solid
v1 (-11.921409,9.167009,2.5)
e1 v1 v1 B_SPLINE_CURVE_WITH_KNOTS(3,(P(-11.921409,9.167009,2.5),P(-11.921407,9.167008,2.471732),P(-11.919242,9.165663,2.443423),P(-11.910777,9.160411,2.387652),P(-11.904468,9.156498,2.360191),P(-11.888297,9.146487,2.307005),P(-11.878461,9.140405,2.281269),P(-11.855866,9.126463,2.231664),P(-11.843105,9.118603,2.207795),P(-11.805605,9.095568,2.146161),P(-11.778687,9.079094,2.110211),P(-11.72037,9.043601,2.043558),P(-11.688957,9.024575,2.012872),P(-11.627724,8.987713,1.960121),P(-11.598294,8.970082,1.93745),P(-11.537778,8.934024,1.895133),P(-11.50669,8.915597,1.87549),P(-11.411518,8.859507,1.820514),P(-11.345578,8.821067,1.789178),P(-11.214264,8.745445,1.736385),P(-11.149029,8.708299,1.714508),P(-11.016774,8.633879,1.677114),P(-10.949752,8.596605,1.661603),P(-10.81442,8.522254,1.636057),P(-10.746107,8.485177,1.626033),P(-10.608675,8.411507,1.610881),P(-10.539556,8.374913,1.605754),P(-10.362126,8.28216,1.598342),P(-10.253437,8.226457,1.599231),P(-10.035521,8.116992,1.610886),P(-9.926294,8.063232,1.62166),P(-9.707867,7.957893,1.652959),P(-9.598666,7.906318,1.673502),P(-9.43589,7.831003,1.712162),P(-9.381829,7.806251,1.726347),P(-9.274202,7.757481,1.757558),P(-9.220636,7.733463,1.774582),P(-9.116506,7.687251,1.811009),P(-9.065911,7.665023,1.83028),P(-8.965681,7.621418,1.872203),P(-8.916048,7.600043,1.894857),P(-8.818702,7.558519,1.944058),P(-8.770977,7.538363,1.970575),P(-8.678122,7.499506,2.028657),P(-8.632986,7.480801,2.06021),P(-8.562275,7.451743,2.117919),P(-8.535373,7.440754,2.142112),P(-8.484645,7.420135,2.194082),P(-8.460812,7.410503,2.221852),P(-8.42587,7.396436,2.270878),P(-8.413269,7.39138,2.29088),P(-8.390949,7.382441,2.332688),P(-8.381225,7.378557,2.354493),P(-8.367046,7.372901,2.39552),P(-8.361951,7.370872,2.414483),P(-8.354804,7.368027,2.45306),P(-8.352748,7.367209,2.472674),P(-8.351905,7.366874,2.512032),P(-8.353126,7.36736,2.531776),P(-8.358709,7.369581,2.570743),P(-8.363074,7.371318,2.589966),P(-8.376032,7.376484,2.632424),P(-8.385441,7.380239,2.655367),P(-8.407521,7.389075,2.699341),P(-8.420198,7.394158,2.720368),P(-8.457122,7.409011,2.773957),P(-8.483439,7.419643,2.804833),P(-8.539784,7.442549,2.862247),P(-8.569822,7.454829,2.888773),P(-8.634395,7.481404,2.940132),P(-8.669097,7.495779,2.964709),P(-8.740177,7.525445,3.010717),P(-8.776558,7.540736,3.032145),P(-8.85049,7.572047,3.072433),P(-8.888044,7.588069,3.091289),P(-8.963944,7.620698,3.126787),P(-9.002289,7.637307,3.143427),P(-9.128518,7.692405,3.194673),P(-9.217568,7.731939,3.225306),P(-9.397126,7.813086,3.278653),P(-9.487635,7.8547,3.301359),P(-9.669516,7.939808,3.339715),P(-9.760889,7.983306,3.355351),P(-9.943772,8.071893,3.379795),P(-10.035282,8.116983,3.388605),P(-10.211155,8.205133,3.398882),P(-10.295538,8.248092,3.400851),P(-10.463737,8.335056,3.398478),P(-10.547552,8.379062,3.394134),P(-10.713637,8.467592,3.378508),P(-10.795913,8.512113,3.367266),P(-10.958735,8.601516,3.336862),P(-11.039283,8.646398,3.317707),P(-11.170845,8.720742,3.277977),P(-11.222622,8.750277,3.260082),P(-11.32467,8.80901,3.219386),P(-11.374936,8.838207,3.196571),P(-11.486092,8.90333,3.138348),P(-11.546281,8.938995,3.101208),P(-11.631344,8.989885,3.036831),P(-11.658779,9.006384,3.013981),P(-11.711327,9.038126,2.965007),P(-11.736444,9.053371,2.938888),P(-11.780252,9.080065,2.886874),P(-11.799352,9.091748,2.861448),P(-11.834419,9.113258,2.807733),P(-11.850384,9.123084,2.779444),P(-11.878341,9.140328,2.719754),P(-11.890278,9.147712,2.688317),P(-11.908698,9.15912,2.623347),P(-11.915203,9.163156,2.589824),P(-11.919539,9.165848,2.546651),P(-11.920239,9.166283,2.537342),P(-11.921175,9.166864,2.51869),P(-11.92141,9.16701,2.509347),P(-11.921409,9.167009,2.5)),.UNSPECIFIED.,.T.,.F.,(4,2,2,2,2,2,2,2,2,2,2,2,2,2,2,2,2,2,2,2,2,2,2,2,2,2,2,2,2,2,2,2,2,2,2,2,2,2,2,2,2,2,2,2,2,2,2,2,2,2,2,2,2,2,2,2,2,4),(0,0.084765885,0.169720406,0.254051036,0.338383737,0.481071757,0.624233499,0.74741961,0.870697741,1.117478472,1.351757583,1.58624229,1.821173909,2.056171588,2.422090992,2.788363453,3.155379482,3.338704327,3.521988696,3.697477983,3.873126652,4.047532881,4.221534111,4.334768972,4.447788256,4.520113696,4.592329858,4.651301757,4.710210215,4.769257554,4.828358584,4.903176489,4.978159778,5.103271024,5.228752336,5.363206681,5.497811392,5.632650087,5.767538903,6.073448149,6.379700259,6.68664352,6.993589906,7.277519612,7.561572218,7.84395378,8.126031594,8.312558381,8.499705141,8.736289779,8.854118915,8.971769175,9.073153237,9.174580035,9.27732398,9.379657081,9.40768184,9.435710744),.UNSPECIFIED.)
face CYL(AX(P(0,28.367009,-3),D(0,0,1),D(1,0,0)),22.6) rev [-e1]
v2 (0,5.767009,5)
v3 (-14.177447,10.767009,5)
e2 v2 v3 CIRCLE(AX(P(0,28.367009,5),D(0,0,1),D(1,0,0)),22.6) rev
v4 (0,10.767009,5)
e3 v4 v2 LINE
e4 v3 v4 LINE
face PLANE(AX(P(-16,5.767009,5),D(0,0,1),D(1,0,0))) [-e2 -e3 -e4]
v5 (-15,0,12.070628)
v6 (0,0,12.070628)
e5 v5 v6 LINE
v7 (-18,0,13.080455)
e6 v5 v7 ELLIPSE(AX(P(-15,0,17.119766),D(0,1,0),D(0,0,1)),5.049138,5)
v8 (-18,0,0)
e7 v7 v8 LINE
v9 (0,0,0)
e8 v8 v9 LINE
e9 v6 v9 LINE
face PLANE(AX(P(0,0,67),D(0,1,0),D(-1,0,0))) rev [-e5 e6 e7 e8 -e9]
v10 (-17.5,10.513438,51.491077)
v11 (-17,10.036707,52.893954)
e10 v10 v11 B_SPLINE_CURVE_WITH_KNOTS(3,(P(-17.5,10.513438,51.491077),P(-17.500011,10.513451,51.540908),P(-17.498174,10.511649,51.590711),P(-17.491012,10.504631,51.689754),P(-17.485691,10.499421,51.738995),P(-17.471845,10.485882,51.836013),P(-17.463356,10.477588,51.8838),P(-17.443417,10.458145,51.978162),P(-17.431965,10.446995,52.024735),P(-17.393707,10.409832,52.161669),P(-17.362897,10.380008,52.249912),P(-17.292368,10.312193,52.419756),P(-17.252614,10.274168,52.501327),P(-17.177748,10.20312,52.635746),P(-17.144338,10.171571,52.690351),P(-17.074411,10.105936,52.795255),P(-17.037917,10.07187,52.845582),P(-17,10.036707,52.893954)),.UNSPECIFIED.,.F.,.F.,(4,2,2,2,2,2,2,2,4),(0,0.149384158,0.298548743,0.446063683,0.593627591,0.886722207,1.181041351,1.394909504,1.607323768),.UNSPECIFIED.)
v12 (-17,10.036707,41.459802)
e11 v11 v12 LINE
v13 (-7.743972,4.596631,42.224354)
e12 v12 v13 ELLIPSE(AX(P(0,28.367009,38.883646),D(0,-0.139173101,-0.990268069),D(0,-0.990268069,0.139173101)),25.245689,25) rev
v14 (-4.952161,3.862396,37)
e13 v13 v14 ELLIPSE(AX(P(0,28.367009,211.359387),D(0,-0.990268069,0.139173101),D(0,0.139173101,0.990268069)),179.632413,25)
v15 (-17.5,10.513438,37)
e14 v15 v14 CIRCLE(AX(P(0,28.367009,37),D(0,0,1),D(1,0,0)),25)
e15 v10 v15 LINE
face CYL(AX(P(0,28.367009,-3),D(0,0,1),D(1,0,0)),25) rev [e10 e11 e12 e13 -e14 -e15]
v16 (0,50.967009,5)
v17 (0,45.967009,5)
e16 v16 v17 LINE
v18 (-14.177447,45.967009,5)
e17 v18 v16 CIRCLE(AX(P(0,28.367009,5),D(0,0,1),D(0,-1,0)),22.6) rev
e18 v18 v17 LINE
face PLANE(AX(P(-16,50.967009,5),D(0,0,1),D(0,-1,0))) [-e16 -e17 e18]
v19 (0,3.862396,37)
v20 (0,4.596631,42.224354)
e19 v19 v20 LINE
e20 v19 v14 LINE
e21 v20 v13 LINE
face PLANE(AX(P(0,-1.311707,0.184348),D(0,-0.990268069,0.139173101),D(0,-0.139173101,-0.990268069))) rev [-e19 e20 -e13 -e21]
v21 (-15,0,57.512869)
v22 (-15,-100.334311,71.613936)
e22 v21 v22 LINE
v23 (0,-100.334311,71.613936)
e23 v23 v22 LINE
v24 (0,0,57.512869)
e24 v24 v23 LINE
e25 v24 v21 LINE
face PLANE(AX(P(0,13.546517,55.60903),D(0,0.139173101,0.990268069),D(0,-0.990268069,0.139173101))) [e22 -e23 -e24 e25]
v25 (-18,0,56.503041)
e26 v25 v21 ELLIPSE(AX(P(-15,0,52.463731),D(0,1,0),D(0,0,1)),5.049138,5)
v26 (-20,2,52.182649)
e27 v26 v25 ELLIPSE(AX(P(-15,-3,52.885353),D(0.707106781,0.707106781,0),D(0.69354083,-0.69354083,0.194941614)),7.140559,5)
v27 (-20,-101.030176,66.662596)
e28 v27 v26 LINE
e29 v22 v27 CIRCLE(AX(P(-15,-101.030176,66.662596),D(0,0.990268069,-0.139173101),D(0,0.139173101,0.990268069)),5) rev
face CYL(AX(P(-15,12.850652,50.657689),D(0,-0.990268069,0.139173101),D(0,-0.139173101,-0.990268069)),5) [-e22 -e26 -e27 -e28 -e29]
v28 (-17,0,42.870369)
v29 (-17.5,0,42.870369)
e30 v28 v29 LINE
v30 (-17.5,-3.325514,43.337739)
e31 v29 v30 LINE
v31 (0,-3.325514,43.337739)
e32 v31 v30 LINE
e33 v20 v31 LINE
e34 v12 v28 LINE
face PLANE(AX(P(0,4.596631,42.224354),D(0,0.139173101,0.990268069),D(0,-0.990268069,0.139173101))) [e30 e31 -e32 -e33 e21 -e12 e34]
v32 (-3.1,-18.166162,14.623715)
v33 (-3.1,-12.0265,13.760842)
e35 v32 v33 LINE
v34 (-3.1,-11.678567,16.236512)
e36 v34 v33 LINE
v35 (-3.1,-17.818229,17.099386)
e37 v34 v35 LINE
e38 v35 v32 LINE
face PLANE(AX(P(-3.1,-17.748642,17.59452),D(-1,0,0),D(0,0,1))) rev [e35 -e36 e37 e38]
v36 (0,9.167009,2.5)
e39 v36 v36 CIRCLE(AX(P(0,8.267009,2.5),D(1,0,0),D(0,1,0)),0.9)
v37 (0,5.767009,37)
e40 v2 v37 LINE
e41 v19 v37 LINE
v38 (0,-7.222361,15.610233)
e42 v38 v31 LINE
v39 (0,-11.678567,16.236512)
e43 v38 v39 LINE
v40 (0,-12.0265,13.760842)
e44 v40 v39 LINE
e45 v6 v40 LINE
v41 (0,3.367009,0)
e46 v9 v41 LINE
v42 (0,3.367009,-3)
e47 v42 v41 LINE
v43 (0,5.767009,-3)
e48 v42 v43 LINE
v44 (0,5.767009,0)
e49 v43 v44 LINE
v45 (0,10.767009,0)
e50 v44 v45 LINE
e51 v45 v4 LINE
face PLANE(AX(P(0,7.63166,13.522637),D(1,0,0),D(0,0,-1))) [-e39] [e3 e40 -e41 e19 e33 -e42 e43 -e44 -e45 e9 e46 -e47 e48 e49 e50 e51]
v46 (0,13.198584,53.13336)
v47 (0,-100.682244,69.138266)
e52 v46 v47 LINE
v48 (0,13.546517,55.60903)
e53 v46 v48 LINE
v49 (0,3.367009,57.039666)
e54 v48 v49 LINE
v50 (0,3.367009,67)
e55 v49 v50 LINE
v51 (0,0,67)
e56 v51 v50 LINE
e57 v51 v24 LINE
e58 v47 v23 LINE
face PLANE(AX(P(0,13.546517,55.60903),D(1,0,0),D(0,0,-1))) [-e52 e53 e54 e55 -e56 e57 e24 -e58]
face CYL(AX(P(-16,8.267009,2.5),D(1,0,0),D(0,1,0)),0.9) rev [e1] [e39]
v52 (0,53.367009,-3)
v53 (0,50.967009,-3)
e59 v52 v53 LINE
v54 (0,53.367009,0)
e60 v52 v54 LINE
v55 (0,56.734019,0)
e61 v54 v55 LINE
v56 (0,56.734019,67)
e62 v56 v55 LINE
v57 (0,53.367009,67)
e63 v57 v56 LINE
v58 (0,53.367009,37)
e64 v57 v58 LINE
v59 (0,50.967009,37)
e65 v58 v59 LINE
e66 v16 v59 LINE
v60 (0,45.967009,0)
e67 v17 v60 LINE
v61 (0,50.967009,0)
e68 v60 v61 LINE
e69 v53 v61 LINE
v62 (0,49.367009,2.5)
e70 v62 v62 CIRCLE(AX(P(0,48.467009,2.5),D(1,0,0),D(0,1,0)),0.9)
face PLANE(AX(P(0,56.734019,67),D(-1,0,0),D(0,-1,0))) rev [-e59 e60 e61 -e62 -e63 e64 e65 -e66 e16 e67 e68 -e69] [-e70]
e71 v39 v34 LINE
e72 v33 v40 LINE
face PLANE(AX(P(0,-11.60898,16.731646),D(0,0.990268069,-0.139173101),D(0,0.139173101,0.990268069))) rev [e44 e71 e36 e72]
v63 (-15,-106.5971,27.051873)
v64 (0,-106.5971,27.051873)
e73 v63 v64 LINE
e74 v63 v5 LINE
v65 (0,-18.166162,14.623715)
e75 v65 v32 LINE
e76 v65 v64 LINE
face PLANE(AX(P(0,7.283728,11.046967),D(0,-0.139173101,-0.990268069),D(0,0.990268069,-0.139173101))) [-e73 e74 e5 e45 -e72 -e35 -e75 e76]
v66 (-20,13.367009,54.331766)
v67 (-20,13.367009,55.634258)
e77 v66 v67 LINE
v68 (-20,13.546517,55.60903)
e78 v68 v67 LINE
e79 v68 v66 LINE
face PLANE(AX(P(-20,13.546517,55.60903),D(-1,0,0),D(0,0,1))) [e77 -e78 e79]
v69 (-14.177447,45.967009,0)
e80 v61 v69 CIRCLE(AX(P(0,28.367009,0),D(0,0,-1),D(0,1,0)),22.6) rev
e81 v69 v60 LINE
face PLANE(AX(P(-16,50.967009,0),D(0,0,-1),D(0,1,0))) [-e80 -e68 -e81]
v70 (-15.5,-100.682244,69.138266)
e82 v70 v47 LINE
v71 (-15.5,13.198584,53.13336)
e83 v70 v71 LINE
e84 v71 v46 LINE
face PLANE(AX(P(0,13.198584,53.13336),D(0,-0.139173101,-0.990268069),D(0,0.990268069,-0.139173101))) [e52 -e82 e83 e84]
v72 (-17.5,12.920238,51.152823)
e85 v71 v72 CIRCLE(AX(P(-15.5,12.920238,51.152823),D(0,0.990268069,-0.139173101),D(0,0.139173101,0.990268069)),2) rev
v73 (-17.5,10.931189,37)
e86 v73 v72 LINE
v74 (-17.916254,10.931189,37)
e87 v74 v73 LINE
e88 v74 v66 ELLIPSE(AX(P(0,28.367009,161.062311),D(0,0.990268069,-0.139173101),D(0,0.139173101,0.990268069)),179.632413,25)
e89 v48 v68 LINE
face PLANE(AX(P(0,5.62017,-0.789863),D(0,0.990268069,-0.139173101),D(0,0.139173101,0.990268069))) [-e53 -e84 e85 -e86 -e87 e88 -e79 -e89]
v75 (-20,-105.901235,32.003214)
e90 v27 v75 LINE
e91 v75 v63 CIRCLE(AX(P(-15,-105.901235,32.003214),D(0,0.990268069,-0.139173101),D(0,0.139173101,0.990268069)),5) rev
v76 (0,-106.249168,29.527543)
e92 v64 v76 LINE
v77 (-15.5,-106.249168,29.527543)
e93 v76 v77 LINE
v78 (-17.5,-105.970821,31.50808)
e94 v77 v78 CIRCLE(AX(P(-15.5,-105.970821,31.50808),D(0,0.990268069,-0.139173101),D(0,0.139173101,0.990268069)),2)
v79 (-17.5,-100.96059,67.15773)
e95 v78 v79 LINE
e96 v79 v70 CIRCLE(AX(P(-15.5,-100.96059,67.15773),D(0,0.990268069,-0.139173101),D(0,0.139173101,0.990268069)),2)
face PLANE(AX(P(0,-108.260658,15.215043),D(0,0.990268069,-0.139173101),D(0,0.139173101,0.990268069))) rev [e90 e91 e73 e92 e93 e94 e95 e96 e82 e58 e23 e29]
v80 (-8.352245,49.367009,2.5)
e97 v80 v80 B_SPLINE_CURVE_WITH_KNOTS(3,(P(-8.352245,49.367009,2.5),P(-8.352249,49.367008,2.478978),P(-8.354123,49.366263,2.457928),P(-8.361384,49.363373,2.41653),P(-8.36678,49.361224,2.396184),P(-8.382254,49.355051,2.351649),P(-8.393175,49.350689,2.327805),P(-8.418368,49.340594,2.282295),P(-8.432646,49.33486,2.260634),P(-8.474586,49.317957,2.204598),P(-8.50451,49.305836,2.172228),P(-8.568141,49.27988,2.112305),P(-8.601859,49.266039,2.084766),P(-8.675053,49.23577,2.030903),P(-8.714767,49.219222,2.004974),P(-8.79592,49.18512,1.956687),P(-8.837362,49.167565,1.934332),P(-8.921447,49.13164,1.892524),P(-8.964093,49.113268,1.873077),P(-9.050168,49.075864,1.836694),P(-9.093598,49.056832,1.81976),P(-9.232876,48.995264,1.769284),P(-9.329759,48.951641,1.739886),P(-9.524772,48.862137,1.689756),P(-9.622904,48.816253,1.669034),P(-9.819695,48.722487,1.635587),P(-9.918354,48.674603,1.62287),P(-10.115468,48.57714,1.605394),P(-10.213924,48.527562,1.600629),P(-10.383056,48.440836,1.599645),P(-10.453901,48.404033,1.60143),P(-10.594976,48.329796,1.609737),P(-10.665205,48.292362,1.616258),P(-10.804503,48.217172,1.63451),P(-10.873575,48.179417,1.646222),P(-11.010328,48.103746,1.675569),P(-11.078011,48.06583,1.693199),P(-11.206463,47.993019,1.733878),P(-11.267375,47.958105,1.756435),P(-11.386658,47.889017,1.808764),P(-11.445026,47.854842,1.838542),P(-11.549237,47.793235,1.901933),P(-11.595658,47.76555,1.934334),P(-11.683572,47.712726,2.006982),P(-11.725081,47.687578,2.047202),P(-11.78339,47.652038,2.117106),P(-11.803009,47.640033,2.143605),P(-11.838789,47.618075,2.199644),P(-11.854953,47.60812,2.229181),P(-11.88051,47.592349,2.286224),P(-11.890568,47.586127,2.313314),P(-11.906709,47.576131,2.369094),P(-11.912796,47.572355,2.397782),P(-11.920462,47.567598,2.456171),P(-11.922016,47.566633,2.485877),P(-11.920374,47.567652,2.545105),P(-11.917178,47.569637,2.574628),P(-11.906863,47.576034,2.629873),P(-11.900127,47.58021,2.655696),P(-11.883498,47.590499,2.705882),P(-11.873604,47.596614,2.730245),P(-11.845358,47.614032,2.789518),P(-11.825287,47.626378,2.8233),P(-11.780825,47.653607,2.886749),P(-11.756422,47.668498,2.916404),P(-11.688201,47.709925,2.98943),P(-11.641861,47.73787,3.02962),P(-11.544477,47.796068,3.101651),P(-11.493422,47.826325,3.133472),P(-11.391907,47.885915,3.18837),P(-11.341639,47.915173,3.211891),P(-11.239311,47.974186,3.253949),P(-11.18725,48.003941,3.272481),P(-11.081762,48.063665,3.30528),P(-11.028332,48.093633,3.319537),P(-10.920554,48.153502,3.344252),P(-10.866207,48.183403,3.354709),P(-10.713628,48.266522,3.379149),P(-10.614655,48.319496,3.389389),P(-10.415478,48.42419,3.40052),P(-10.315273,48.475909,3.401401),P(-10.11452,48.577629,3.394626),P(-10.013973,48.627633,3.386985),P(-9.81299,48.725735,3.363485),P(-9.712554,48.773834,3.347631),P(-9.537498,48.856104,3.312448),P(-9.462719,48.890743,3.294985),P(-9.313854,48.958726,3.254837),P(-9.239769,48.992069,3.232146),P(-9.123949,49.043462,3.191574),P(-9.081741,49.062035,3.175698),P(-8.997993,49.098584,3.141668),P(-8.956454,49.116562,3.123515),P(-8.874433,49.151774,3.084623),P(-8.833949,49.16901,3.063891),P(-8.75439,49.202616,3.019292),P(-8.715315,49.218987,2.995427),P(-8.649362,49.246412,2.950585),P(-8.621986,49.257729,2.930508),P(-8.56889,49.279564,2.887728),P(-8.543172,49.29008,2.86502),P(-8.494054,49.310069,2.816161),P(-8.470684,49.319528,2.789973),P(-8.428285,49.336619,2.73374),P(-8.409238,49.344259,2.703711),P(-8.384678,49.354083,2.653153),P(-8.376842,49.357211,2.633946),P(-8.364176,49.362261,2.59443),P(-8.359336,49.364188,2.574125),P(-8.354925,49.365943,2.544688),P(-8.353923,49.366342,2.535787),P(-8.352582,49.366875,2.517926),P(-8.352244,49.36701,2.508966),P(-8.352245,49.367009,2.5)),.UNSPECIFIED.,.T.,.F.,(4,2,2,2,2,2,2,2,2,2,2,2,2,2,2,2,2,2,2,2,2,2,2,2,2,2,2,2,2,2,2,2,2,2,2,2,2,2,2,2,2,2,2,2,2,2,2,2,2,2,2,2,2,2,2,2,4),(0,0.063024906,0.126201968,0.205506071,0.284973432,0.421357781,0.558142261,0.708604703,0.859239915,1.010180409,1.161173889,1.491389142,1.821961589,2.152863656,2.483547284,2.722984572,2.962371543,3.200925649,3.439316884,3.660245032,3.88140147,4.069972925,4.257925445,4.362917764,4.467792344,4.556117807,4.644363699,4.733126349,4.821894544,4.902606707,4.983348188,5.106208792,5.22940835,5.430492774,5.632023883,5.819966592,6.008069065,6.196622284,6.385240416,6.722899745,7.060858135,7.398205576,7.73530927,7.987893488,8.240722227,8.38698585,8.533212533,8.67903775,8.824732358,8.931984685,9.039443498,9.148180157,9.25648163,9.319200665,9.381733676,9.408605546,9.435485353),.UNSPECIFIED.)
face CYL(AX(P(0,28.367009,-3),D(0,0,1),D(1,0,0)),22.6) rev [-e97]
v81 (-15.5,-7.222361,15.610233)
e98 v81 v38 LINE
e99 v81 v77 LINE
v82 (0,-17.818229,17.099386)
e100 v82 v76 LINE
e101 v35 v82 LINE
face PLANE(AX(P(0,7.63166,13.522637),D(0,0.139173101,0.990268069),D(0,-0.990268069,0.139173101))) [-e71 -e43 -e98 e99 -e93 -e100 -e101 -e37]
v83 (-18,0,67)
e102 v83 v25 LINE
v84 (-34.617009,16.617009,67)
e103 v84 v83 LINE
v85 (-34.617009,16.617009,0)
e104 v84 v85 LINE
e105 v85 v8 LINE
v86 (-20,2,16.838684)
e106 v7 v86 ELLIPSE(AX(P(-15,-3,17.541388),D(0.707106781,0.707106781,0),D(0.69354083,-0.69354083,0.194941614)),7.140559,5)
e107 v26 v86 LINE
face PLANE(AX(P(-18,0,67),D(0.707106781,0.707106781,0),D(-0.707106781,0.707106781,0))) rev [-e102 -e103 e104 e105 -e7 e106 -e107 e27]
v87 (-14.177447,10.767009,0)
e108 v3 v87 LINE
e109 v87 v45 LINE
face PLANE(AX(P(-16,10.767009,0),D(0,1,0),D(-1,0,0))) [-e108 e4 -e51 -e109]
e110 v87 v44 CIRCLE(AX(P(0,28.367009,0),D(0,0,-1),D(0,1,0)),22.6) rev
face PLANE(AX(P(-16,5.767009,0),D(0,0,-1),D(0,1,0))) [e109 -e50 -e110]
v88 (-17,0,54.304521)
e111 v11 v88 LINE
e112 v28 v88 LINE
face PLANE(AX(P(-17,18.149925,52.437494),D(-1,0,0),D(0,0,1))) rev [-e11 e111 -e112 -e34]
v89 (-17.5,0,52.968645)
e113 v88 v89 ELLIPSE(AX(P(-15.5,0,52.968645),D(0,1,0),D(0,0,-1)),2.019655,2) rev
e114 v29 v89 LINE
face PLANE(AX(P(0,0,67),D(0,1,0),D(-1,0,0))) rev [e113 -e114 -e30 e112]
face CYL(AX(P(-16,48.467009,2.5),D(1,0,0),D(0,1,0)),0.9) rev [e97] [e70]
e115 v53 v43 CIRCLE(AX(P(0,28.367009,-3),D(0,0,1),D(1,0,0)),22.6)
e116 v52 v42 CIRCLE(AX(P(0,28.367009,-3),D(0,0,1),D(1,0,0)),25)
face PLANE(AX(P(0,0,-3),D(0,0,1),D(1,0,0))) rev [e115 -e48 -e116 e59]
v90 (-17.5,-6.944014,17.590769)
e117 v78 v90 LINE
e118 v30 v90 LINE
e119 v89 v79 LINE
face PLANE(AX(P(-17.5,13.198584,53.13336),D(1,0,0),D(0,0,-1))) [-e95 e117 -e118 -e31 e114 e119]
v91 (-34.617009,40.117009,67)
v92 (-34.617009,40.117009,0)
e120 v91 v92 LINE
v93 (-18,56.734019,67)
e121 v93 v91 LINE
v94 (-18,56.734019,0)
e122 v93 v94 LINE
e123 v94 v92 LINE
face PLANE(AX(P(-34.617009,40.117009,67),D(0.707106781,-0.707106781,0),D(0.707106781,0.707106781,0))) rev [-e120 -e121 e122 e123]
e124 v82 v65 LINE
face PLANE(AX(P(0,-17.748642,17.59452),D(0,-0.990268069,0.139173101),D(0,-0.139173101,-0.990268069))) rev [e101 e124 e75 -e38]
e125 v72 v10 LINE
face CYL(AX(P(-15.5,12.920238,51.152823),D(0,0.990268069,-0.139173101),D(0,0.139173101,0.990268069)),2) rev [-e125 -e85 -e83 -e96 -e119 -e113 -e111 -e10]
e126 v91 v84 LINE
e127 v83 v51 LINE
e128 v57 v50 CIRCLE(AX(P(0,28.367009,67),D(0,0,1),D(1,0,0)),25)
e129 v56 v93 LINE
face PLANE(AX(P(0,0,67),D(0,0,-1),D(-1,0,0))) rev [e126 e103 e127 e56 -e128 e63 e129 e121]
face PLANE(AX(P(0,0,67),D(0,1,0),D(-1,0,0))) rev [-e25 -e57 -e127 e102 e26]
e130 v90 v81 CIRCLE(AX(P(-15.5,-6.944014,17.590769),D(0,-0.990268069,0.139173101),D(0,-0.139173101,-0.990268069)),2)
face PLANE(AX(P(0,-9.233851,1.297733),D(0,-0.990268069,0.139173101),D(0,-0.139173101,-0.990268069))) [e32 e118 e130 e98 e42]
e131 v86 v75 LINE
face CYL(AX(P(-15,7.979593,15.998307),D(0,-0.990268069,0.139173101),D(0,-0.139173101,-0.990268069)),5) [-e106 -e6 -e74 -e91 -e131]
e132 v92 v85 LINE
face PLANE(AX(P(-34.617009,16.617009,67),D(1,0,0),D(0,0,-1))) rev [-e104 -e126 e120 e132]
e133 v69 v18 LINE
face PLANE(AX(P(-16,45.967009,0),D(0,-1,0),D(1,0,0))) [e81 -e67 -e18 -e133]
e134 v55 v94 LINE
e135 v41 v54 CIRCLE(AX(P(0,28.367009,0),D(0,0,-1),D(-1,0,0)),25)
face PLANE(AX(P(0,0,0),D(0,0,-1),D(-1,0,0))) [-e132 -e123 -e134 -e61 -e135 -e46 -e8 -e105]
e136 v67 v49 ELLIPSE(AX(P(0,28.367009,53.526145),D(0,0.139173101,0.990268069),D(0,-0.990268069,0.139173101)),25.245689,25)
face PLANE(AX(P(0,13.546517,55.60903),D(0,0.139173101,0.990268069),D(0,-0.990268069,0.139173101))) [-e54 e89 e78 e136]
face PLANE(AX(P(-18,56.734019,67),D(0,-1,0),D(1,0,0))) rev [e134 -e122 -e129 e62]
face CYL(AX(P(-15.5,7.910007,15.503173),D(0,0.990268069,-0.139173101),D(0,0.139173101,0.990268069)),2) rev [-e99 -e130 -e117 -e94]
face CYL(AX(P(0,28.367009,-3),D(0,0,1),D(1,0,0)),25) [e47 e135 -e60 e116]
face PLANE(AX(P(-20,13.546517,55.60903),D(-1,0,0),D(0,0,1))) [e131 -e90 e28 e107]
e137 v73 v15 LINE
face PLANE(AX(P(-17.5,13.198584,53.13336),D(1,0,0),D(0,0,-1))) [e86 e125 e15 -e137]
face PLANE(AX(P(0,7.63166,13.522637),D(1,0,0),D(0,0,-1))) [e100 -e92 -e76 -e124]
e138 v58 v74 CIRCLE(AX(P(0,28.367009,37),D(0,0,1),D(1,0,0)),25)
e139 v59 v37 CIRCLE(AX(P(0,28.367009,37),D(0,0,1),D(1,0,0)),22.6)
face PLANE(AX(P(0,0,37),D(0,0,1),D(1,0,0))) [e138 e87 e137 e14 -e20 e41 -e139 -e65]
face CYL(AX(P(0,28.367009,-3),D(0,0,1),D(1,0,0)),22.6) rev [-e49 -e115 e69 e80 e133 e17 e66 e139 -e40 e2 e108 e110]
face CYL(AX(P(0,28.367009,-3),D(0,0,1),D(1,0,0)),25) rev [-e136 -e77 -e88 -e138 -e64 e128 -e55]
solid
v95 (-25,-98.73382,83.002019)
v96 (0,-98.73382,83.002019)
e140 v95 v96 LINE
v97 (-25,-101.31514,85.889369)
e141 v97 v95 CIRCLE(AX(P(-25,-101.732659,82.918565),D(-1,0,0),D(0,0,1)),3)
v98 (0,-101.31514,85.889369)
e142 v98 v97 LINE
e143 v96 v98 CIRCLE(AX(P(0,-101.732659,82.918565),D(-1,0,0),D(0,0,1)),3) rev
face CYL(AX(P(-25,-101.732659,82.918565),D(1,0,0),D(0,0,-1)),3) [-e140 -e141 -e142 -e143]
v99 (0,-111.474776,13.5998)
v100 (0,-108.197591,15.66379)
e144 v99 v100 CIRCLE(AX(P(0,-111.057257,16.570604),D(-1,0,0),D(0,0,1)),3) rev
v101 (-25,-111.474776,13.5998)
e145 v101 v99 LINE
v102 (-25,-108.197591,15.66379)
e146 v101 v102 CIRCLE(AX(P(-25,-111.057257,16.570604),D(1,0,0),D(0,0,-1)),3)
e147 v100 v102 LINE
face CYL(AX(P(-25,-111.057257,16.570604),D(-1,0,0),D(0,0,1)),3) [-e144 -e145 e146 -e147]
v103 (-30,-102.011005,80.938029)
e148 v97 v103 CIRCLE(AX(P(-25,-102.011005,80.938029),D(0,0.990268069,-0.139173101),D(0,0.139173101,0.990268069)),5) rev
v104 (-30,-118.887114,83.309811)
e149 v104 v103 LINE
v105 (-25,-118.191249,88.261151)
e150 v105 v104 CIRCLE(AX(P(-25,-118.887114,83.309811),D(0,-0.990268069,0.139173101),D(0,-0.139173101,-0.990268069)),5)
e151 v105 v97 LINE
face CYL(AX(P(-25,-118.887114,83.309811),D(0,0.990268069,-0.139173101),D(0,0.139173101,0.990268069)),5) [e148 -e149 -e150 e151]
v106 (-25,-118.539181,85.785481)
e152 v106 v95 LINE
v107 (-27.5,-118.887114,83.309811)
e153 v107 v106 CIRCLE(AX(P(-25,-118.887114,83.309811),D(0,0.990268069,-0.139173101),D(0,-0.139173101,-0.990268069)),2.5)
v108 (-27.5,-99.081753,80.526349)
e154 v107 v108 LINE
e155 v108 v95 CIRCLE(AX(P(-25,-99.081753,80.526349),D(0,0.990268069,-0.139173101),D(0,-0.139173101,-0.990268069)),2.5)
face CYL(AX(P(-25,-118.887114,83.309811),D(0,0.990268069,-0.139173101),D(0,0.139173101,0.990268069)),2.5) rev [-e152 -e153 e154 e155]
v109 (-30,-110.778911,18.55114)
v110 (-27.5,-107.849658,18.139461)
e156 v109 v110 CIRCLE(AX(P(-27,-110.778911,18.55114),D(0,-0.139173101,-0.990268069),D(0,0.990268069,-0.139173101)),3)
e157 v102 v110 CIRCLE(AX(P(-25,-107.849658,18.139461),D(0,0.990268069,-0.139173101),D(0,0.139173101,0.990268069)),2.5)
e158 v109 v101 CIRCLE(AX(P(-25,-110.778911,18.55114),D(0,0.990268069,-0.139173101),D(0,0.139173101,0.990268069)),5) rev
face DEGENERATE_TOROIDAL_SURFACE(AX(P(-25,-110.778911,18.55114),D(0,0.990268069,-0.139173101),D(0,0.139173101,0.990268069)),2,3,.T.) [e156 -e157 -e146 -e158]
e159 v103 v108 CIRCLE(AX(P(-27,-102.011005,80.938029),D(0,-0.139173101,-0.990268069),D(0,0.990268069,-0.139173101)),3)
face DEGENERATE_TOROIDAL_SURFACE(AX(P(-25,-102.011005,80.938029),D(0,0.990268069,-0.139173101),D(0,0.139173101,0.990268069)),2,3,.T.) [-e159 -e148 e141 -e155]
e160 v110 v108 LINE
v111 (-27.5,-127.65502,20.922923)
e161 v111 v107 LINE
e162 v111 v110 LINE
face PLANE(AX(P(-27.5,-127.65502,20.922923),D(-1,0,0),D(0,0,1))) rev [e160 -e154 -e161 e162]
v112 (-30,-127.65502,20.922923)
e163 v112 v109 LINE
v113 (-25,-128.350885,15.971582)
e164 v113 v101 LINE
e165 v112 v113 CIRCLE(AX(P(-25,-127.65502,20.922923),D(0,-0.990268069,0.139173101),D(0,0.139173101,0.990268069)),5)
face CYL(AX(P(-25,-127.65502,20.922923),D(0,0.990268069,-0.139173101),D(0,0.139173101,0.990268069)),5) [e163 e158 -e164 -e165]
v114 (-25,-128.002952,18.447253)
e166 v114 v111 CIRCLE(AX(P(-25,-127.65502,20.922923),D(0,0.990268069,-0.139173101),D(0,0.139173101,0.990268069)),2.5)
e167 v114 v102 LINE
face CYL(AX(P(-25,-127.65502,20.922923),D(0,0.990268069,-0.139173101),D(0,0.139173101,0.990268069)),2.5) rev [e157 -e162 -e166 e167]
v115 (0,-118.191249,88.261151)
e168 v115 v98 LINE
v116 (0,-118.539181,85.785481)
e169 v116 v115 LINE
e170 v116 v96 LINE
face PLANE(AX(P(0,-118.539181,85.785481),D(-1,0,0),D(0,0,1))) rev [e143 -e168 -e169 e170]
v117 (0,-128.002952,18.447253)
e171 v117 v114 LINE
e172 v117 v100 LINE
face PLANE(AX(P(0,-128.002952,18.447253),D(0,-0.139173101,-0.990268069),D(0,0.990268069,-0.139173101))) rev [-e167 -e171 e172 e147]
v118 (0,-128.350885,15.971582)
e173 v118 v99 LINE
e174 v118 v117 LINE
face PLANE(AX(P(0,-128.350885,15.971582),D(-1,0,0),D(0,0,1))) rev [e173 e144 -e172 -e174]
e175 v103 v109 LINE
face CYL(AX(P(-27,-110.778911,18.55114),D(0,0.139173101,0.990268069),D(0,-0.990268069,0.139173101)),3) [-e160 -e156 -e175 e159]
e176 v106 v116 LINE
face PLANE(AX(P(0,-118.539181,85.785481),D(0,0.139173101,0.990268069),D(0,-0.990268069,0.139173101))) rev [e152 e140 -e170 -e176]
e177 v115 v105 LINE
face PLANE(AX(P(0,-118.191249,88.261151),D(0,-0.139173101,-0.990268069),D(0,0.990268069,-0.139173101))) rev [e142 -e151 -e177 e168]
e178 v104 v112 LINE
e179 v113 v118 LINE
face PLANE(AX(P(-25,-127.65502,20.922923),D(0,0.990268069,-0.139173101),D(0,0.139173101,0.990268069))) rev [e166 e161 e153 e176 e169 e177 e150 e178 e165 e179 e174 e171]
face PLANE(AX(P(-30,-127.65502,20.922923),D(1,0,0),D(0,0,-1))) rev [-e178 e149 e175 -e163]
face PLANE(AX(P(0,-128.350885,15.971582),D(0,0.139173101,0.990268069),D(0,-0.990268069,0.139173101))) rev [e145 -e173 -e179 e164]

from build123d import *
from build123d.topology import SkipClean

# Parameters (mm, degrees)
Y_KSEKLIK_EKSTR_ZYON1_DEPTH      = 67
IZIM2_R                          = 25
KES_EKSTR_ZYON1_DEPTH            = 70
Y_KSEKLIK_EKSTR_ZYON2_DEPTH      = 40
Y_KSEKLIK_EKSTR_ZYON7_DEPTH      = 100
Y_KSEKLIK_EKSTR_ZYON7_DEPTH_BACK = 15
IZIM15_W                         = 5
IZIM15_H                         = 5
IZIM15_R                         = 0.9
Y_KSEKLIK_EKSTR_ZYON8_DEPTH      = 16
IZIM11_R                         = 22.5
KES_EKSTR_ZYON17_DEPTH           = 33
IZIM24_W                         = 12
IZIM24_H                         = 17
KES_EKSTR_ZYON18_DEPTH           = 20
IZIM29_W                         = 28
IZIM29_H                         = 17.5
Y_KSEKLIK_EKSTR_ZYON12_DEPTH     = 8
IZIM34_W                         = 3.1
IZIM34_H                         = 6.2
KES_EKSTR_ZYON20_DEPTH           = 3
IZIM44_R                         = 22.6
KES_EKSTR_ZYON25_DEPTH           = 30
RADYUS4_R                        = 5
RADYUS5_START                    = -109.324597764
RADYUS5_DEPTH                    = 115
Y_KSEKLIK_EKSTR_ZYON16_DEPTH     = 20
RADYUS7_R                        = 3


with BuildPart() as part:
    # Çizim1 → Yükseklik-Ekstrüzyon1 (new body)
    with BuildSketch(Plane.XY):
        Polygon((0, 0), (-18, 0), (-34.617009358, 16.617009358), (-34.617009358, 40.117009358), (-18, 56.734018716), (0, 56.734018716), align=None)
    extrude(amount=Y_KSEKLIK_EKSTR_ZYON1_DEPTH)

    # Çizim2 → Kes-Ekstrüzyon1 (cut)
    with BuildSketch(Plane.XY.offset(67)):
        with Locations((0, 28.367009358)):
            Circle(IZIM2_R)
    extrude(amount=-KES_EKSTR_ZYON1_DEPTH, mode=Mode.SUBTRACT)

    # Çizim5 → Yükseklik-Ekstrüzyon2 (add)
    with BuildSketch(Plane.XY.offset(37)):
        with BuildLine():
            Line((0, 50.967009358), (0, 53.367009358))
            ThreePointArc((0, 53.367009358), (-25, 28.367009358), (0, 3.367009358))
            Line((0, 3.367009358), (0, 5.767009358))
            ThreePointArc((0, 5.767009358), (-22.6, 28.367009358), (0, 50.967009358))
        make_face()
    extrude(amount=-Y_KSEKLIK_EKSTR_ZYON2_DEPTH)

    # Çizim15 → Yükseklik-Ekstrüzyon8 (add)
    # profile 1 of 2: a face of its own
    with BuildSketch(Plane(origin=(0, 0, 0), x_dir=(0, 0, -1), z_dir=(1, 0, 0))):
        with Locations((-2.5, 8.267009358)):
            Rectangle(IZIM15_W, IZIM15_H)
        with Locations(Location((-2.5, 8.267009358, 0), (0, 0, 90))):
            Circle(IZIM15_R, mode=Mode.SUBTRACT)
    # profile 2 of 2: a face of its own
    with BuildSketch(Plane(origin=(0, 0, 0), x_dir=(0, 0, -1), z_dir=(1, 0, 0))):
        with Locations((-2.5, 48.467009358)):
            Rectangle(IZIM15_W, IZIM15_H)
        with Locations(Location((-2.5, 48.467009358, 0), (0, 0, 90))):
            Circle(IZIM15_R, mode=Mode.SUBTRACT)
    extrude(amount=-Y_KSEKLIK_EKSTR_ZYON8_DEPTH)

    # Çizim24 → Kes-Ekstrüzyon18 (cut)
    with BuildSketch(Plane(origin=(0, -9.23385142, 1.297733186), x_dir=(0, -0.13917310096006572, -0.9902680687415703), z_dir=(0, -0.9902680687415703, 0.13917310096006572))):
        with Locations((-48.453157304, -8.5)):
            Rectangle(IZIM24_W, IZIM24_H)
    extrude(amount=-KES_EKSTR_ZYON18_DEPTH, mode=Mode.SUBTRACT)



with BuildPart() as body_2:
    # Çizim21 → Yükseklik-Ekstrüzyon7 (new, two sides: drawn at the far end of the back side and taken through both)
    with BuildSketch(Plane(origin=(0, -9.23385142, 1.297733186), x_dir=(0, -0.13917310096006572, -0.9902680687415703), z_dir=(0, -0.9902680687415703, 0.13917310096006572)).offset(-Y_KSEKLIK_EKSTR_ZYON7_DEPTH_BACK)):
        Polygon((-56.953157304, 0), (-56.953157304, -20), (-11.953157304, -20), (-11.953157304, 0), (-14.453157304, 0), (-14.453157304, -17.5), (-54.453157304, -17.5), (-54.453157304, 0), align=None)
    extrude(amount=Y_KSEKLIK_EKSTR_ZYON7_DEPTH + Y_KSEKLIK_EKSTR_ZYON7_DEPTH_BACK)

    # Çizim11 → Kes-Ekstrüzyon17 (cut)
    with BuildSketch(Plane.XY.offset(37)):
        with Locations((0, 28.367009358)):
            Circle(IZIM11_R)
    extrude(amount=-KES_EKSTR_ZYON17_DEPTH, mode=Mode.SUBTRACT)


with BuildPart() as part_1:
    add(part.part)

    add(body_2.part)  # Yükseklik-Ekstrüzyon12 merges body 2
    # Çizim29 → Yükseklik-Ekstrüzyon12 (add)
    with BuildSketch(Plane(origin=(0, -9.23385142, 1.297733186), x_dir=(0, -0.13917310096006572, -0.9902680687415703), z_dir=(0, -0.9902680687415703, 0.13917310096006572))):
        with Locations((-28.453157304, -8.75)):
            Rectangle(IZIM29_W, IZIM29_H)
    extrude(amount=-Y_KSEKLIK_EKSTR_ZYON12_DEPTH)

    # Çizim34 → Kes-Ekstrüzyon20 (cut)
    with BuildSketch(Plane(origin=(0, 1.663557968, 11.836829998), x_dir=(-1, 0, 0), z_dir=(0, -0.13917310096006574, -0.9902680687415703))):
        with Locations((1.55, -16.924597764)):
            Rectangle(IZIM34_W, IZIM34_H)
    extrude(amount=-KES_EKSTR_ZYON20_DEPTH, mode=Mode.SUBTRACT)

    # Çizim44 → Kes-Ekstrüzyon25 (cut)
    with SkipClean():  # the faces are left unmerged after this step: merging them gives an invalid solid
        with BuildSketch(Plane.XY.offset(37)):
            with Locations((0, 28.367009358)):
                Circle(IZIM44_R)
        extrude(amount=-KES_EKSTR_ZYON25_DEPTH, mode=Mode.SUBTRACT)

    # Radyus4
    radyus4_edges = [part_1.edges().sort_by_distance(p)[0] for p in [
        (-20, -52.298550163, 19.420709718),
        (-20, -49.167155391, 64.422861646),
    ]]
    fillet(radyus4_edges, radius=RADYUS4_R)

    # Radyus5: read off the stored shape, not the designer's step
    # Radyus5 outline → Radyus5 (add)
    with SkipClean():  # the faces are left unmerged after this step: merging them gives an invalid solid
        with BuildSketch(Plane(origin=(0, 0, 0), x_dir=(1, 0, 0), z_dir=(0, 0.9902680687415703, -0.13917310096006602)).offset(RADYUS5_START)):
            with BuildLine():
                Line((-17.5, -52.453157304), (-17.5, -54.453157304))
                Line((-17.5, -54.453157304), (-15.5, -54.453157304))
                ThreePointArc((-15.5, -54.453157304), (-16.914213562, -53.867370866), (-17.5, -52.453157304))
            make_face()
            with BuildLine():
                Line((-17.5, -14.453157304), (-17.5, -16.453157304))
                ThreePointArc((-17.5, -16.453157304), (-16.914213562, -15.038943742), (-15.5, -14.453157304))
                Line((-15.5, -14.453157304), (-17.5, -14.453157304))
            make_face()
        extrude(amount=RADYUS5_DEPTH)


with BuildPart() as body_2_2:
    # Çizim45 → Yükseklik-Ekstrüzyon16 (new body)
    with BuildSketch(Plane(origin=(0, -108.260658294, 15.215043282), x_dir=(1, 0, 0), z_dir=(0, -0.9902680687415703, 0.13917310096006602))):
        with BuildLine():
            Line((0, -2.046842696), (-25, -2.046842696))
            ThreePointArc((-25, -2.046842696), (-28.535533906, -0.582376602), (-30, 2.953157304))
            Line((-30, 2.953157304), (-30, 65.953157304))
            ThreePointArc((-30, 65.953157304), (-28.535533906, 69.48869121), (-25, 70.953157304))
            Line((-25, 70.953157304), (0, 70.953157304))
            Line((0, 70.953157304), (0, 68.453157304))
            Line((0, 68.453157304), (-25, 68.453157304))
            ThreePointArc((-25, 68.453157304), (-26.767766953, 67.720924257), (-27.5, 65.953157304))
            Line((-27.5, 65.953157304), (-27.5, 2.953157304))
            ThreePointArc((-27.5, 2.953157304), (-26.767766953, 1.185390351), (-25, 0.453157304))
            Line((-25, 0.453157304), (0, 0.453157304))
            Line((0, 0.453157304), (0, -2.046842696))
        make_face()
    extrude(amount=Y_KSEKLIK_EKSTR_ZYON16_DEPTH)

    # Radyus7
    # the kernel refuses this fillet: 3 mm, written as the material it takes off along each edge
    with BuildSketch(Plane(origin=(7.395099729, -108.545523739, 13.188120318), x_dir=(0, -0.9902680687415703, 0.13917310096006616), z_dir=(-1, 0, 0)), Plane(origin=(-25, -98.385887369, 85.477689336), x_dir=(0, -0.9902680687415703, 0.13917310096006602), z_dir=(1, 0, 0))) as radyus7_piece_1:
        with BuildLine():
            CenterArc((2.958039892, 3), RADYUS7_R, 189.594068227, 80.405931773)
            Line((0, 2.5), (-0.059160798, 2.49))
            ThreePointArc((-0.059160798, 2.49), (-0.06, 1.25), (-0.06, 0))
            Line((-0.06, 0), (0, -0.06))
            Line((0, -0.06), (2.958039892, -0.06))
            Line((2.958039892, -0.06), (2.958039892, 0))
        make_face()
    extrude(amount=32.395099729, mode=Mode.SUBTRACT)
    with BuildSketch(Plane(origin=(-25, -99.081752874, 80.526348993), x_dir=(-1, 0, 0), z_dir=(2.814511130798017e-15, -0.13917310096006602, -0.9902680687415703))) as radyus7_piece_2:
        with BuildLine():
            CenterArc((2, -2.958039892), RADYUS7_R, 360, 80.405931773)
            Line((2.5, 0), (2.51, 0.059160798))
            ThreePointArc((2.51, 0.059160798), (3.75, 0.06), (5, 0.06))
            Line((5, 0.06), (5.06, 0))
            Line((5.06, 0), (5.06, -2.958039892))
            Line((5.06, -2.958039892), (5, -2.958039892))
        make_face()
    revolve(axis=Axis((-25, -99.081752874, 80.526348993), (0, 0.9902680687415703, -0.13917310096006602)), revolution_arc=90, mode=Mode.SUBTRACT)
    with BuildSketch(Plane(origin=(-30, -107.849658234, 18.139460662), x_dir=(0, -0.9902680687415701, 0.13917310096006602), z_dir=(0, 0.13917310096006602, 0.9902680687415703))) as radyus7_piece_3:
        with BuildLine():
            CenterArc((2.958039892, 3), RADYUS7_R, 189.594068227, 80.405931773)
            Line((0, 2.5), (-0.059160798, 2.49))
            ThreePointArc((-0.059160798, 2.49), (-0.06, 1.25), (-0.06, 0))
            Line((-0.06, 0), (0, -0.06))
            Line((0, -0.06), (2.958039892, -0.06))
            Line((2.958039892, -0.06), (2.958039892, 0))
        make_face()
    extrude(amount=63, mode=Mode.SUBTRACT)
    with BuildSketch(Plane(origin=(-25, -107.849658234, 18.139460662), x_dir=(0, -0.13917310096006474, -0.9902680687415704), z_dir=(1, 0, 0))) as radyus7_piece_4:
        with BuildLine():
            CenterArc((2, -2.958039892), RADYUS7_R, 0, 80.405931773)
            Line((2.5, 0), (2.51, 0.059160798))
            ThreePointArc((2.51, 0.059160798), (3.75, 0.06), (5, 0.06))
            Line((5, 0.06), (5.06, 0))
            Line((5.06, 0), (5.06, -2.958039892))
            Line((5.06, -2.958039892), (5, -2.958039892))
        make_face()
    revolve(axis=Axis((-25, -107.849658234, 18.139460662), (0, 0.9902680687415703, -0.13917310096006602)), revolution_arc=90, mode=Mode.SUBTRACT)


solid = Compound([part_1.part, body_2_2.part])
